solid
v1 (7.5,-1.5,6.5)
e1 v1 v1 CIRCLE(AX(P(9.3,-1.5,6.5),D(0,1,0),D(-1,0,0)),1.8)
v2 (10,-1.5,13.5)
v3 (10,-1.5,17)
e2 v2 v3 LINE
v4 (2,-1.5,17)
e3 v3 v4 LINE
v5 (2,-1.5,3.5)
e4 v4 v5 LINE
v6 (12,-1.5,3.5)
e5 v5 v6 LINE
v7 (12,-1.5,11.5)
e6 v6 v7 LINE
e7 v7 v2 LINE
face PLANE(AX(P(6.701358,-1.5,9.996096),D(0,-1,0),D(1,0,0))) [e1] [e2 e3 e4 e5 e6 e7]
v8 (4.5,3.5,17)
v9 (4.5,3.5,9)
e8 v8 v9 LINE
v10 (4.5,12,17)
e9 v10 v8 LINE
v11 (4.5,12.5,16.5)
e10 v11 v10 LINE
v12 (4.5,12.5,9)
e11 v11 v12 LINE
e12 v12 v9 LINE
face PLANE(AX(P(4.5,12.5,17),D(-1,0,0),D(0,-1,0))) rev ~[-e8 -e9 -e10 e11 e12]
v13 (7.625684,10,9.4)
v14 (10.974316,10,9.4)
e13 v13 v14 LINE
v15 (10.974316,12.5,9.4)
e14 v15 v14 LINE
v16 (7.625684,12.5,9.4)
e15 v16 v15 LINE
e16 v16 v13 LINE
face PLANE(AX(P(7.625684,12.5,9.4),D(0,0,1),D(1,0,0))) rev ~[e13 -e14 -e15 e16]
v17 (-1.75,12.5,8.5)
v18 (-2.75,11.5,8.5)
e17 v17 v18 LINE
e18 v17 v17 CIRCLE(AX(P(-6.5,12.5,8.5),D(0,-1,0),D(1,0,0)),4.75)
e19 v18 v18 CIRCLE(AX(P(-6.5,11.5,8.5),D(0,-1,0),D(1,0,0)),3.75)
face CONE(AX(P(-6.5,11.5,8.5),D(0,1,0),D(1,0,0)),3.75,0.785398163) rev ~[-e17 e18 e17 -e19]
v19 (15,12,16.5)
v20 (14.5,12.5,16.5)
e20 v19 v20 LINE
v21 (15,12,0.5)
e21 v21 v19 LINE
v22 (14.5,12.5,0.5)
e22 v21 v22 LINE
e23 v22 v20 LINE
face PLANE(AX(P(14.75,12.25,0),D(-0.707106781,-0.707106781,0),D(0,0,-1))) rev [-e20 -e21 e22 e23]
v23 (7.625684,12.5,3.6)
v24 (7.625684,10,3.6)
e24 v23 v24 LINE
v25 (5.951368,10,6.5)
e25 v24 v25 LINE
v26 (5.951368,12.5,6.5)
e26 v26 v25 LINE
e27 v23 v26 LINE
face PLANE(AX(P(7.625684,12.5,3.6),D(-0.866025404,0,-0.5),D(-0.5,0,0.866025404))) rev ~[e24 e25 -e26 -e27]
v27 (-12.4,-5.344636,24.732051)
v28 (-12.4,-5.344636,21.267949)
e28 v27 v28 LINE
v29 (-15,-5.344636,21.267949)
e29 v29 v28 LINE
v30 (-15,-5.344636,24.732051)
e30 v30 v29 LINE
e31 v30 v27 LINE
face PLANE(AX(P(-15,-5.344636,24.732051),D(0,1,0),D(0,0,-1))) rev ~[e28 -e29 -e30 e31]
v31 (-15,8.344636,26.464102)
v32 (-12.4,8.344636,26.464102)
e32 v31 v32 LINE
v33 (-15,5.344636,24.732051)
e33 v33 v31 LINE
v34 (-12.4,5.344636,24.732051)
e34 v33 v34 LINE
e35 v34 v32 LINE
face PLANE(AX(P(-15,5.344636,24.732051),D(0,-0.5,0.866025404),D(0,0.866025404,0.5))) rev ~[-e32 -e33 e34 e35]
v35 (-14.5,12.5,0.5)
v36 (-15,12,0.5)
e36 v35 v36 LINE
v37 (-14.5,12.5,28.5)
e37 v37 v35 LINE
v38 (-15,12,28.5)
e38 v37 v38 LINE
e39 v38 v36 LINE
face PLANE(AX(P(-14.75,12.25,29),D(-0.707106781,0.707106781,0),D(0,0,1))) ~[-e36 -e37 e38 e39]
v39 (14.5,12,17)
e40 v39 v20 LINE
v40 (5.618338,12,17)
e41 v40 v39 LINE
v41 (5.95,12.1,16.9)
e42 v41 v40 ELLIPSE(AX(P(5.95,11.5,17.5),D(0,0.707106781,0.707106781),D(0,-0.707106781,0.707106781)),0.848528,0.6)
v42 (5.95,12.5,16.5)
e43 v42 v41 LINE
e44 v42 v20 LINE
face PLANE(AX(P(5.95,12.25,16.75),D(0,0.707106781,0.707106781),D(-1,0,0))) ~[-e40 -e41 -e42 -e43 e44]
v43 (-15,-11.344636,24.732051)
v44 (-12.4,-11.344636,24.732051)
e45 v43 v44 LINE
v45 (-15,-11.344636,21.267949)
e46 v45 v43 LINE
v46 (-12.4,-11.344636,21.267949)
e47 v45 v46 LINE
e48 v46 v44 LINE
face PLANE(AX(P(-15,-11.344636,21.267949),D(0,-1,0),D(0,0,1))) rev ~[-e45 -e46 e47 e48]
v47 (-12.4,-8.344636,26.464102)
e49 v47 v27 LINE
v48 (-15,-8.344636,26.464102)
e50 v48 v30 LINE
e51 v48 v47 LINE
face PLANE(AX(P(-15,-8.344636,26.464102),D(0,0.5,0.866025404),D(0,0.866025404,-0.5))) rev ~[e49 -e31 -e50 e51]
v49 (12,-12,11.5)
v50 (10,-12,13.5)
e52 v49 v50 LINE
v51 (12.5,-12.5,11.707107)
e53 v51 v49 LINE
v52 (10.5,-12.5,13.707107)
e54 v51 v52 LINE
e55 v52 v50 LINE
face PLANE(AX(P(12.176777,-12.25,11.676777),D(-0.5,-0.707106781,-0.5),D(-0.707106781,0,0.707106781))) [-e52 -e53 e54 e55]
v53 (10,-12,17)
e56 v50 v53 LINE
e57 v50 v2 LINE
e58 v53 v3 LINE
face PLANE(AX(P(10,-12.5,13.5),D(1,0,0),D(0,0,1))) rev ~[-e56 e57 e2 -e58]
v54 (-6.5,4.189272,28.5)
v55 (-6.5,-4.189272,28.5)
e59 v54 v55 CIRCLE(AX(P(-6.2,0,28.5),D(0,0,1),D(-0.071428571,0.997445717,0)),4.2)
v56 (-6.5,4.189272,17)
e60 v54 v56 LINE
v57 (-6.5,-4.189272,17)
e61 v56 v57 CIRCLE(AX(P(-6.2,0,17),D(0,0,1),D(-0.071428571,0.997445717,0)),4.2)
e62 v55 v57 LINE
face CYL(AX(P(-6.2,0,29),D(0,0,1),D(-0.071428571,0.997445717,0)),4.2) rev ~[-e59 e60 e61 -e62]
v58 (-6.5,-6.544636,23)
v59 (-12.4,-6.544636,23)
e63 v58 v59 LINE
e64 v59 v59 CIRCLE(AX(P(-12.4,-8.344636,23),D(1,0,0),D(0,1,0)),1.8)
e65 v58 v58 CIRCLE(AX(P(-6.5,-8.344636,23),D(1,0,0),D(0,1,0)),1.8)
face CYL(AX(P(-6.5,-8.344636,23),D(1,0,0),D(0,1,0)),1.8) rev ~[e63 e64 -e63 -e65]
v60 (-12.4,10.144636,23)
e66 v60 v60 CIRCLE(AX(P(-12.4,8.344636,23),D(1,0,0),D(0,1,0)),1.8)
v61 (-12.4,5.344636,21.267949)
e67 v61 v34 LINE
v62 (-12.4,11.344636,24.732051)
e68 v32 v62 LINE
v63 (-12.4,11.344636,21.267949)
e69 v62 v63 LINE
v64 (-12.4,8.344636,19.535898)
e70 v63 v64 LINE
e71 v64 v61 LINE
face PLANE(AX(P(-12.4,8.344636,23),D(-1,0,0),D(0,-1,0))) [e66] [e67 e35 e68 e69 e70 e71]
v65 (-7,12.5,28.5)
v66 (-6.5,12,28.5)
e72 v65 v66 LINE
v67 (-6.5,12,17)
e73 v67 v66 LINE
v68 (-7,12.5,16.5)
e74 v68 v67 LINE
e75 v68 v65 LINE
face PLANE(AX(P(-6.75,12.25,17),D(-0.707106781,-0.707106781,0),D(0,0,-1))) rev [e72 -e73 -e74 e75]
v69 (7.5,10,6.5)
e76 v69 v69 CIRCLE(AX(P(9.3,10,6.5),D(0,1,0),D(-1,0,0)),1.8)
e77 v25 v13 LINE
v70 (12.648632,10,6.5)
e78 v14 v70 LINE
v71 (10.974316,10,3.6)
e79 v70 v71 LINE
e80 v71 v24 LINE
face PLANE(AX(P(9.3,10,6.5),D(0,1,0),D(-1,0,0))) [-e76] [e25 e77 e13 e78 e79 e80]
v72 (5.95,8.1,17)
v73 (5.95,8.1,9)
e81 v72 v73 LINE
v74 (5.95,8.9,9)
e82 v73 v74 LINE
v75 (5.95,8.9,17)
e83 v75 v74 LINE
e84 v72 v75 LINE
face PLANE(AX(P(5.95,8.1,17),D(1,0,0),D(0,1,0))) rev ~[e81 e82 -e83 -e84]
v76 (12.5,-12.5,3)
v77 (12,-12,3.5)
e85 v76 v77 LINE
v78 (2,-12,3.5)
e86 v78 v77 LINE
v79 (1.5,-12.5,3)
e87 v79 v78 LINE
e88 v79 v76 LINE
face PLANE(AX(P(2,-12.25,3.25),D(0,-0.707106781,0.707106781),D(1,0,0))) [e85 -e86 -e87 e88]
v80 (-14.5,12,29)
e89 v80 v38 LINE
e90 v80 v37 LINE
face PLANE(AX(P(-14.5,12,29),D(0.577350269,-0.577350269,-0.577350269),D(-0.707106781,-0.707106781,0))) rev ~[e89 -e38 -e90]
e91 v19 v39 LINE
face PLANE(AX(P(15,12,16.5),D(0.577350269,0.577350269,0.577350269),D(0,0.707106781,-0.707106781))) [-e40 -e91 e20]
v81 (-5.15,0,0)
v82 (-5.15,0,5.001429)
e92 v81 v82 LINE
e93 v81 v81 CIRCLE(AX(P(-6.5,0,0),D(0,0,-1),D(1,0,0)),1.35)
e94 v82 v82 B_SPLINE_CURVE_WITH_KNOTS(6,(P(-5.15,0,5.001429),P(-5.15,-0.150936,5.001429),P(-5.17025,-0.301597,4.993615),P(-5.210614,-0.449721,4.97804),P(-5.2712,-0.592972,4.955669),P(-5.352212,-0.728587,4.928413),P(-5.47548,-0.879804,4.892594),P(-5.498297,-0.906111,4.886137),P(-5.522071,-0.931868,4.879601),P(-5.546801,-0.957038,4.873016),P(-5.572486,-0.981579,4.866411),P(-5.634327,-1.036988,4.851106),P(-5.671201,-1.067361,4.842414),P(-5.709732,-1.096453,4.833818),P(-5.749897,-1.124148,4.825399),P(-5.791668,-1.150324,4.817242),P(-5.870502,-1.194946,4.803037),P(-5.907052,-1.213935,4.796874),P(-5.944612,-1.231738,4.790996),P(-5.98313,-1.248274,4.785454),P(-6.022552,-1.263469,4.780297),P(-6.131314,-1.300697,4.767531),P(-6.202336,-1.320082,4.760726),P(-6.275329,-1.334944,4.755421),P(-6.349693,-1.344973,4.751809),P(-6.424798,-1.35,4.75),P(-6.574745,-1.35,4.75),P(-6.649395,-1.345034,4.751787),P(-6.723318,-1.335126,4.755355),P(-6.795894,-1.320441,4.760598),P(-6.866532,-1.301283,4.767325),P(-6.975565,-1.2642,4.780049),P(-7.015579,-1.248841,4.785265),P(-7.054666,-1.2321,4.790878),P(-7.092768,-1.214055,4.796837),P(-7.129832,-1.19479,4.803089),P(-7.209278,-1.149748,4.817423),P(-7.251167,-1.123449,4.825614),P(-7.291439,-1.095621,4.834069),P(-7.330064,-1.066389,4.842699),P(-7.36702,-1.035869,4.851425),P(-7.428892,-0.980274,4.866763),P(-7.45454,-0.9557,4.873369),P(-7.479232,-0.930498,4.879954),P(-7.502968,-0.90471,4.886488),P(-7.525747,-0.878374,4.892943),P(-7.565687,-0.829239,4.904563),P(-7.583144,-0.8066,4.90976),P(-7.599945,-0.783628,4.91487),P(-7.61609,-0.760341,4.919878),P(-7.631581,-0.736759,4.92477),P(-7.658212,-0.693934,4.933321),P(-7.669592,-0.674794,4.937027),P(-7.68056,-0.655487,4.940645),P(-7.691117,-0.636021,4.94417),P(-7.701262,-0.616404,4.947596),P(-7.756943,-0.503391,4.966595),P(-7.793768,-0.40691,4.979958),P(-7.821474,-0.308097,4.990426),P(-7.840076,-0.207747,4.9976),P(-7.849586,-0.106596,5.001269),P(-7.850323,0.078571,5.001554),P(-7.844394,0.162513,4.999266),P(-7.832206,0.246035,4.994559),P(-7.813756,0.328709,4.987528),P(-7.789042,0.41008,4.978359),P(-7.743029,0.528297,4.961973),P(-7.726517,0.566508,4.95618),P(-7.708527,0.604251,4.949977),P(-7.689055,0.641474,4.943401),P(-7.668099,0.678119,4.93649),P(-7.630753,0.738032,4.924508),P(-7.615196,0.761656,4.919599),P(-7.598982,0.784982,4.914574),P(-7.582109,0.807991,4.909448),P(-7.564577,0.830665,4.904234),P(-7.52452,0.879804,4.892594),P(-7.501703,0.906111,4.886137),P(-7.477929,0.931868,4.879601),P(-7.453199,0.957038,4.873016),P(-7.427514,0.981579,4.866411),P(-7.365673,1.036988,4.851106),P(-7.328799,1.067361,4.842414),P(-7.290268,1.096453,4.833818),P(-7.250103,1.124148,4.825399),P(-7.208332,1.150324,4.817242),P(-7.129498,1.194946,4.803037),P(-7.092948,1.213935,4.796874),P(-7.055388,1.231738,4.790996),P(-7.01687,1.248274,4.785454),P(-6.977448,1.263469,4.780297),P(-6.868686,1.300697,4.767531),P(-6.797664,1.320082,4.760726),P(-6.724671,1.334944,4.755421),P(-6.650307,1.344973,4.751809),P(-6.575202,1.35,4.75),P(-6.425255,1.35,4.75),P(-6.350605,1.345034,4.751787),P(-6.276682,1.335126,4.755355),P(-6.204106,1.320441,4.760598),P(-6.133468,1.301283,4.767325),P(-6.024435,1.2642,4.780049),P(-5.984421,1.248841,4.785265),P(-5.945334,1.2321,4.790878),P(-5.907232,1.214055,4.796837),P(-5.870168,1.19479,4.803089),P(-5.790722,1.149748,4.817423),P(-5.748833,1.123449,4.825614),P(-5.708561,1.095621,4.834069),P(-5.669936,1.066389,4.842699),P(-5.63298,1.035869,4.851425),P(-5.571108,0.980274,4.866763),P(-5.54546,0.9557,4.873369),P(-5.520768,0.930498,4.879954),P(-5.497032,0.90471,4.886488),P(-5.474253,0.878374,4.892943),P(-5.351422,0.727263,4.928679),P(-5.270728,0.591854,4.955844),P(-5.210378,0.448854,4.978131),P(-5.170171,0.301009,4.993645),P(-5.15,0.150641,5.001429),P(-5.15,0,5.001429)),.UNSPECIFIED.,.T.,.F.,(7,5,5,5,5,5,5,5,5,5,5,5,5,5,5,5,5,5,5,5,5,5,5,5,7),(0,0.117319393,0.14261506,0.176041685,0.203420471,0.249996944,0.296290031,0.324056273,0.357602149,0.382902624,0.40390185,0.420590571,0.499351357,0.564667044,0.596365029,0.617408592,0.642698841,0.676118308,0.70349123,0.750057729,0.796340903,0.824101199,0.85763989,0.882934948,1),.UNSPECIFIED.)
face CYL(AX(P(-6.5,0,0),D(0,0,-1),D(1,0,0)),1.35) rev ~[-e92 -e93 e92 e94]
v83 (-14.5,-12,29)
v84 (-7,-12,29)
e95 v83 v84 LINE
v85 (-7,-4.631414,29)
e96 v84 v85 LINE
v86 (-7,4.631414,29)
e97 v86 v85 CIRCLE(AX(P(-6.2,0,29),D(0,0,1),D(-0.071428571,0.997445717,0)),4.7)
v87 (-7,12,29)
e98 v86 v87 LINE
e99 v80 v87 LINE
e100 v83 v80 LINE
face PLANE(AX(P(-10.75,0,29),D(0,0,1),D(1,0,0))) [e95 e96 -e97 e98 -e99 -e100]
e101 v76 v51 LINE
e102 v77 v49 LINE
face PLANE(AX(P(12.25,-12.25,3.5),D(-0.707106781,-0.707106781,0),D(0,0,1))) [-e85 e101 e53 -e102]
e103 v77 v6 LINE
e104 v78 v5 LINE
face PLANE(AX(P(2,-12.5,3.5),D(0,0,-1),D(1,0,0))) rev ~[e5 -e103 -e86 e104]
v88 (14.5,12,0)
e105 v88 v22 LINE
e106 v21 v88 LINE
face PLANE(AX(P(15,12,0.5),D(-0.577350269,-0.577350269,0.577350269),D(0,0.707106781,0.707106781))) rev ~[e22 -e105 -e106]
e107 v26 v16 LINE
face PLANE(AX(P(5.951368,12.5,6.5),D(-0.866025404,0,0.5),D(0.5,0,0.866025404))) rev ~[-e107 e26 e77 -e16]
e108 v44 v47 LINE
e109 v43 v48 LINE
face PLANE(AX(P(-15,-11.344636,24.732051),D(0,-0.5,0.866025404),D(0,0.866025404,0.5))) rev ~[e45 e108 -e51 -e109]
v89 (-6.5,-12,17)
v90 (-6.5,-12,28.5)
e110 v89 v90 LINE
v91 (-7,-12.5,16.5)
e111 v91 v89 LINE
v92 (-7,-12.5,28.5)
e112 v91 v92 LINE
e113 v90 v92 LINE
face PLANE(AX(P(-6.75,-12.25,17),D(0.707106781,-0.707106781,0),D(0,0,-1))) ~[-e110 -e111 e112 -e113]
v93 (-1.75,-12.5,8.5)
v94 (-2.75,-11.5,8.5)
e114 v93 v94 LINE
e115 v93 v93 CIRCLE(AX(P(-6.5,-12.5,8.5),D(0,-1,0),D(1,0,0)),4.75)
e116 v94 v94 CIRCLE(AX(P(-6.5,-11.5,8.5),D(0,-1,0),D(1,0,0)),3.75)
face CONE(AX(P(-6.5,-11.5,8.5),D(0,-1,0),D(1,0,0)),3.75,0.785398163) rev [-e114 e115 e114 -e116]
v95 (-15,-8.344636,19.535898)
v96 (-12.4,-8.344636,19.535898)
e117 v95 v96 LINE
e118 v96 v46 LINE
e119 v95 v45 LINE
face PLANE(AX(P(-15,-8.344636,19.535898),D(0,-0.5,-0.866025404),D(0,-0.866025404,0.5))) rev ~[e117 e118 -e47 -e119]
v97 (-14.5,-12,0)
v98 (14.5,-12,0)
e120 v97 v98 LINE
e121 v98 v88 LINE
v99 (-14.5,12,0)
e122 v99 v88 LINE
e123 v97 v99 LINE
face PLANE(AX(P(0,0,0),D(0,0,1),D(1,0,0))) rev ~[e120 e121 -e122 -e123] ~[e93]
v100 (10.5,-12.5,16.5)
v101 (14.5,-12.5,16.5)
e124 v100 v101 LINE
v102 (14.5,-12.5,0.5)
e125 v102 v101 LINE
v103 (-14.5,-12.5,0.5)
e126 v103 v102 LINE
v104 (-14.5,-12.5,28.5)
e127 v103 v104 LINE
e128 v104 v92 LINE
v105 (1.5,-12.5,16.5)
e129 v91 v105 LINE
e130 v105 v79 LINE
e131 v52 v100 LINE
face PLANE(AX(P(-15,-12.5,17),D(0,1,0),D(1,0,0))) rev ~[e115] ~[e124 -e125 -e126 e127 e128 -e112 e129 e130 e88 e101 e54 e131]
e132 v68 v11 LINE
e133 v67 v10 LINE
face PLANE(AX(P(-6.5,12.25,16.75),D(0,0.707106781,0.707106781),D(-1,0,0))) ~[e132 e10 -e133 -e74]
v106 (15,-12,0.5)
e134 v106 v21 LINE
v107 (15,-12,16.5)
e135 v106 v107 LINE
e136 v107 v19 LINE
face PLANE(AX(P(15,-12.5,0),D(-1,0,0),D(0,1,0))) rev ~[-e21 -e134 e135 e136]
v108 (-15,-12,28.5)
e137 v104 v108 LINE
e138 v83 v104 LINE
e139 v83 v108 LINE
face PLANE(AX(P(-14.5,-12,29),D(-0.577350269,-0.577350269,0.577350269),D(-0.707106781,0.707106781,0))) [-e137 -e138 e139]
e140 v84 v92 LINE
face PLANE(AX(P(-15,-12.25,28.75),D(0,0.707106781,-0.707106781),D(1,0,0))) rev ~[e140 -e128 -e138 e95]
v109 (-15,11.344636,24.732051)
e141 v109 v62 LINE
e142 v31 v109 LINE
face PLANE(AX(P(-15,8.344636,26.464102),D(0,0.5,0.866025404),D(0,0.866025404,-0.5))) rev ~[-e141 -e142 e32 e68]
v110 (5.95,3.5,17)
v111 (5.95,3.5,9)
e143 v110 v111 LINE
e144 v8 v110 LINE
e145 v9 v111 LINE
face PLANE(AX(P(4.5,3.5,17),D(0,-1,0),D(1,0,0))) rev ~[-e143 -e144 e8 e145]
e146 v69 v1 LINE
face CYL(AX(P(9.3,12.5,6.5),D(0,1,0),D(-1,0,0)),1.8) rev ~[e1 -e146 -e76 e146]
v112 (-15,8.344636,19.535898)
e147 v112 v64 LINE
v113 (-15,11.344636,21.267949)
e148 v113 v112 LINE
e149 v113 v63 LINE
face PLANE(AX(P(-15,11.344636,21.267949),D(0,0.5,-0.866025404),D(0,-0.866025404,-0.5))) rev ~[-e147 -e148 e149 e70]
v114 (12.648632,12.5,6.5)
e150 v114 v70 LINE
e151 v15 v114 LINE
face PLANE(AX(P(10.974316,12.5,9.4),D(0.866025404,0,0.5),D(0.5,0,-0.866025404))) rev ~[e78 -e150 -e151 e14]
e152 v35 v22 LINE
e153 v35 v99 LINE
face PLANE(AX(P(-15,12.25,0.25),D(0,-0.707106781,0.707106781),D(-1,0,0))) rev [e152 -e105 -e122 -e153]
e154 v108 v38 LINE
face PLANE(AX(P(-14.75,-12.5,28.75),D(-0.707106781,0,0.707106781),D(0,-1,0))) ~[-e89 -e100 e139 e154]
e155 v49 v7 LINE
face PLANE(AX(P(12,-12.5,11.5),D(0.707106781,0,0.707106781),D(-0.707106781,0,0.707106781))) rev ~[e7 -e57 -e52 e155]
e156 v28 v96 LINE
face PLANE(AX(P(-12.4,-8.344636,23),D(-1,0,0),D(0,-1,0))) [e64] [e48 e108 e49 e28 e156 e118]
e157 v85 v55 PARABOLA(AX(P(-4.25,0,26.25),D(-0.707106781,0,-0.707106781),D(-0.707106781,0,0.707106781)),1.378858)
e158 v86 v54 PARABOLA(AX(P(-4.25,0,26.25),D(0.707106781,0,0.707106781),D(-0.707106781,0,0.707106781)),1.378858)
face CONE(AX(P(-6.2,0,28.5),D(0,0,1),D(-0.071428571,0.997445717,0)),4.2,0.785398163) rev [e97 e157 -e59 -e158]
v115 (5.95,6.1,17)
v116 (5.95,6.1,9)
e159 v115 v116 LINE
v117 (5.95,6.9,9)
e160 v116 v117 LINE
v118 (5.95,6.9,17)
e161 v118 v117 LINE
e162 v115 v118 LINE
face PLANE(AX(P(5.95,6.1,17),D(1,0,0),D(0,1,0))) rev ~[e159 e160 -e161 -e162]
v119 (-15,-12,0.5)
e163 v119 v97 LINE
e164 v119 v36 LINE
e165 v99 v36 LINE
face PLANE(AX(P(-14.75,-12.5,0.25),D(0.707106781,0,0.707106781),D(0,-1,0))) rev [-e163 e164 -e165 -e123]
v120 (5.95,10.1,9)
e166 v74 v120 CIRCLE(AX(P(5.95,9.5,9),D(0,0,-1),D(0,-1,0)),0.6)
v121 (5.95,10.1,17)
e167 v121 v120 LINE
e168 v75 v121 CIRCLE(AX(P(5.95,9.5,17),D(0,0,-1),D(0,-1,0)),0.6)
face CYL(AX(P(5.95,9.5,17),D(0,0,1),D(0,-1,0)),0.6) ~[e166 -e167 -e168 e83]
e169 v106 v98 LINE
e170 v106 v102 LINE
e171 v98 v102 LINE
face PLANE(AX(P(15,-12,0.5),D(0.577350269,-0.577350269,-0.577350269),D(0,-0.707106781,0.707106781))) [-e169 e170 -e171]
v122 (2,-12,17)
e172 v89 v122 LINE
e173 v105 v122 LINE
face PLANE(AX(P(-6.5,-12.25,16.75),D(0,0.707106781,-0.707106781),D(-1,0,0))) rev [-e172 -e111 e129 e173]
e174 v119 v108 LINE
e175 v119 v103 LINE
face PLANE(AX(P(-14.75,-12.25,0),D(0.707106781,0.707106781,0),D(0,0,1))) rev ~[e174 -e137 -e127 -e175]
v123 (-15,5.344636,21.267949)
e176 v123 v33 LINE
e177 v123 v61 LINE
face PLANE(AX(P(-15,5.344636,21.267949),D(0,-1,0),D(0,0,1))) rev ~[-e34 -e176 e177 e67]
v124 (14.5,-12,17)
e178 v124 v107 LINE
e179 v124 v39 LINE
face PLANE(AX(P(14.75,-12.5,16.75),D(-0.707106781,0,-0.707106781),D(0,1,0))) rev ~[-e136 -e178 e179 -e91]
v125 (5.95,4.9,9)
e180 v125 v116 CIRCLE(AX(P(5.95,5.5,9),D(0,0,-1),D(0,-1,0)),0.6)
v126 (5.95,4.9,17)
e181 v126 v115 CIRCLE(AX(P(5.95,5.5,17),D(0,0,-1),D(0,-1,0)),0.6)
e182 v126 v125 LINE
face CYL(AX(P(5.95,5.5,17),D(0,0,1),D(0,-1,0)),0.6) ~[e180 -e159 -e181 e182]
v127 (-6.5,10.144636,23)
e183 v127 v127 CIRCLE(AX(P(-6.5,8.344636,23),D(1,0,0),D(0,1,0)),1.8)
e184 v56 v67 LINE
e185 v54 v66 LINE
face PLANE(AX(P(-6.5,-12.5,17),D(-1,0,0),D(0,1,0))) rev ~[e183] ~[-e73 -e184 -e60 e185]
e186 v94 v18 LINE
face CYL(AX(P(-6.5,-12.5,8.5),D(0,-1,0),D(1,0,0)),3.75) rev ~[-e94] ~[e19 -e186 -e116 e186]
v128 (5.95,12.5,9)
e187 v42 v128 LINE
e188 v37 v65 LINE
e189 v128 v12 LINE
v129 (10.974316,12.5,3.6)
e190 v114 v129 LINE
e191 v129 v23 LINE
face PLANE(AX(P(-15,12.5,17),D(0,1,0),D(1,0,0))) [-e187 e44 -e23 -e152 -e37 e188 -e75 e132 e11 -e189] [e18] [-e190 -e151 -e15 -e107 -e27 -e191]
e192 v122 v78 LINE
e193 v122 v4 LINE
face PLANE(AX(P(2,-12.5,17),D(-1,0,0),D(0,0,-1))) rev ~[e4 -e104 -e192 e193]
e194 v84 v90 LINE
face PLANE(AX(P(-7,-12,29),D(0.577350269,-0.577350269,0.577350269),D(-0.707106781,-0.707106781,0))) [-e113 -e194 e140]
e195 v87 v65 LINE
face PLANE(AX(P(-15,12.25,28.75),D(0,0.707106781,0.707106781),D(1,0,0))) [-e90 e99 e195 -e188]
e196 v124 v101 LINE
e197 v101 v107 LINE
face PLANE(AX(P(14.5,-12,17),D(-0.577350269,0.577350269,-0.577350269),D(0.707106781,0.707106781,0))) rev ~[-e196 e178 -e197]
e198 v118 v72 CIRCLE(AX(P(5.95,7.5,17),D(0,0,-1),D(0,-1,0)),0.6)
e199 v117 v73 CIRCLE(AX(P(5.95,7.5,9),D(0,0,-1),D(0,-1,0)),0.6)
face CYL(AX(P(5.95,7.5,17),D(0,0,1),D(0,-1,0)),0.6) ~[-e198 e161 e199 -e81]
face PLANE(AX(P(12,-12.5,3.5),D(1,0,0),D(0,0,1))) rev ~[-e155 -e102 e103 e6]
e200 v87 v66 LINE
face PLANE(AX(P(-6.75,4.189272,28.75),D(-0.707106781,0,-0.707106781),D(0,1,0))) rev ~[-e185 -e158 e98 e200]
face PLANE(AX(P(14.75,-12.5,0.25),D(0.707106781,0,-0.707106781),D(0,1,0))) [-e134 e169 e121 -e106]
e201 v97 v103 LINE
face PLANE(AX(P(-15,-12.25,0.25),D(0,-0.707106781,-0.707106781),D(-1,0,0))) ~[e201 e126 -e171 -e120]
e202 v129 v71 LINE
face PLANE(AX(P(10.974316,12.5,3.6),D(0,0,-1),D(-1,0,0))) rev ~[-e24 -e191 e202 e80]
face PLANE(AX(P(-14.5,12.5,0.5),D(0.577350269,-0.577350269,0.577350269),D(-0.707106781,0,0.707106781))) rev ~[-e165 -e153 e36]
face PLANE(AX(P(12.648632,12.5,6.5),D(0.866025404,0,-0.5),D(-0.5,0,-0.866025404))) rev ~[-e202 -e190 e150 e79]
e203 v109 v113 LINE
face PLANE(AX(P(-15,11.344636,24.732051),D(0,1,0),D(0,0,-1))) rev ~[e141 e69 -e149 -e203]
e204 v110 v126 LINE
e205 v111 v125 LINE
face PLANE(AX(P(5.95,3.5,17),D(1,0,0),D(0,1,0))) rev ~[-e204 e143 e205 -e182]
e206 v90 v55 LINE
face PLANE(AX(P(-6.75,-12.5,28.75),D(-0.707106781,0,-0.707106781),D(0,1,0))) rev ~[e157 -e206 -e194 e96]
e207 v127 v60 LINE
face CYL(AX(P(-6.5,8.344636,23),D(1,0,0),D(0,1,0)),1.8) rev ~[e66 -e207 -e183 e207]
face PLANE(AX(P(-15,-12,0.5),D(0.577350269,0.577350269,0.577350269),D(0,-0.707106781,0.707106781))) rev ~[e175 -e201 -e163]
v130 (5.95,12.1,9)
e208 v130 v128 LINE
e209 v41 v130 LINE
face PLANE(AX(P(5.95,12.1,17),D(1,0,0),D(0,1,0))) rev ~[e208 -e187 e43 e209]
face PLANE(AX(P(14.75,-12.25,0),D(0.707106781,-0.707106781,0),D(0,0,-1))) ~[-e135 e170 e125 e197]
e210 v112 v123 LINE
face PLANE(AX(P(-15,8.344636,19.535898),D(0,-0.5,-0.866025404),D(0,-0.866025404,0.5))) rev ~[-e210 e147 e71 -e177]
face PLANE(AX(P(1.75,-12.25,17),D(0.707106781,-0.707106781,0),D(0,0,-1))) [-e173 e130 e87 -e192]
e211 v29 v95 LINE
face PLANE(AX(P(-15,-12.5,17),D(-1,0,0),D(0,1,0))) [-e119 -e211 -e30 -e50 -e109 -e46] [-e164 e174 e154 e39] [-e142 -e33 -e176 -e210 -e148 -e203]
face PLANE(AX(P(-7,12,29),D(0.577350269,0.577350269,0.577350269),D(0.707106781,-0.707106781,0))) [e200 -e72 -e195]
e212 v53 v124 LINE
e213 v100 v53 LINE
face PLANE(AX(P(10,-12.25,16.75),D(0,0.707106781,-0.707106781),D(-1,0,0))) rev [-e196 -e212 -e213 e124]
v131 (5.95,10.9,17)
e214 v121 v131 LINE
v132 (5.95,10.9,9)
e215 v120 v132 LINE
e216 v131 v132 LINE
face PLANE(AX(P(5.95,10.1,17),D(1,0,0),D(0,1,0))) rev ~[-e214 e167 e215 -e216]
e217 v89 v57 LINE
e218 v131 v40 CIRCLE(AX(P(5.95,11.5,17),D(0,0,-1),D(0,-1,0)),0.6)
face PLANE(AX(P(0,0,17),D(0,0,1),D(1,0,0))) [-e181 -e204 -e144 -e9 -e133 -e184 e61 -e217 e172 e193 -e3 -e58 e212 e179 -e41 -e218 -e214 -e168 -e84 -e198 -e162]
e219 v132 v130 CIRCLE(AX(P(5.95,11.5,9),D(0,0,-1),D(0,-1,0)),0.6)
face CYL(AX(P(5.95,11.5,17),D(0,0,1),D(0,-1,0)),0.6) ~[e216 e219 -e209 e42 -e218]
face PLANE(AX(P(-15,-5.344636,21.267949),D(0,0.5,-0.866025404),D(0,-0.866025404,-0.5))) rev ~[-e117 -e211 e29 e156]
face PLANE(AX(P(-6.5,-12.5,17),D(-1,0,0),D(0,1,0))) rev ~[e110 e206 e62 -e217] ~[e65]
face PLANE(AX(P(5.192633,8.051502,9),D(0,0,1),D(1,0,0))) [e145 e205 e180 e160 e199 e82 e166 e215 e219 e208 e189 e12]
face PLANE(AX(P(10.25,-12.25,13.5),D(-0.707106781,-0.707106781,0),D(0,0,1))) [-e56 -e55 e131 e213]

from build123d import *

# Parameters (mm, degrees)
F0_W      = 30
F0_H      = 25
F1_DEPTH  = 17
F3_DEPTH  = 11
F4_R      = 3.75
F5_DEPTH  = 25
F6_W      = 8.5
F6_H      = 25
F7_DEPTH  = 12
F9_DEPTH  = 12
F10_R     = 1.8
F11_DEPTH = 8.5
F12_R     = 1.8
F13_DEPTH = 2.6
F15_DEPTH = 8
F16_R     = 1.8
F17_DEPTH = 14
F18_R     = 1.8
F19_DEPTH = 2.5
F21_SIZE  = 0.5
F22_SIZE2 = 1
F22_SIZE  = 1
F23_R     = 1.35
F24_DEPTH = 5.0024289632


# Not quite as in the source:
# - a feature names something its author has since deleted; it is built from what else it names


with BuildPart() as f1:
    # F0 (on Top) → F1 (new body)
    with BuildSketch(Plane.XY):
        Rectangle(F0_W, F0_H)
    extrude(amount=F1_DEPTH)

    # F2 (on face) → F3 (cut)
    with BuildSketch(Plane.XZ.offset(12.5)):
        Polygon((10, 17), (2, 17), (2, 3.5), (12, 3.5), (12, 11.5), (10, 13.5), align=None)
    extrude(amount=-F3_DEPTH, mode=Mode.SUBTRACT)

    # F4 (on face) → F5 (cut, through all)
    with BuildSketch(Plane.XZ.offset(12.5)):
        with Locations((-6.5, 8.5)):
            Circle(F4_R)
    extrude(amount=-F5_DEPTH, mode=Mode.SUBTRACT)

    # F6 (on face) → F7 (join)
    with BuildSketch(Plane.XY.offset(17)):
        with Locations((-10.75, 0)):
            Rectangle(F6_W, F6_H)
    extrude(amount=F7_DEPTH)

    # F8 (on face) → F9 (cut)
    with BuildSketch(Plane.XY.offset(29)):
        with BuildLine():
            Line((-6.5, -4.1892720131), (-6.5, 4.1892720131))
            ThreePointArc((-6.5, 4.1892720131), (-10.4, 0), (-6.5, -4.1892720131))
        make_face()
    extrude(amount=-F9_DEPTH, mode=Mode.SUBTRACT)

    # F10 (on face) → F11 (cut, through all)
    with BuildSketch(Plane.YZ.offset(-6.5)):
        with Locations((-8.3446360066, 23)):
            Circle(F10_R)
        with Locations((8.3446360066, 23)):
            Circle(F10_R)
    extrude(amount=-F11_DEPTH, mode=Mode.SUBTRACT)

    # F12 (on face) → F13 (cut)
    with BuildSketch(Plane(origin=(-15, 0, 0), x_dir=(0, -1, 0), z_dir=(-1, 0, 0))):
        Polygon((11.3446360067, 21.2679491924), (11.3446360067, 24.7320508076), (8.3446360067, 26.4641016151), (5.3446360067, 24.7320508076), (5.3446360067, 21.2679491924), (8.3446360067, 19.5358983849), align=None)
        with Locations((8.3446360066, 23)):
            Circle(F12_R, mode=Mode.SUBTRACT)
        Polygon((-5.3446360064, 21.2679491924), (-5.3446360064, 24.7320508076), (-8.3446360064, 26.4641016151), (-11.3446360064, 24.7320508076), (-11.3446360064, 21.2679491924), (-8.3446360064, 19.5358983849), align=None)
        with Locations((-8.3446360066, 23)):
            Circle(F12_R, mode=Mode.SUBTRACT)
    extrude(amount=-F13_DEPTH, mode=Mode.SUBTRACT)

    # F14 (on face) → F15 (cut)
    with BuildSketch(Plane.XY.offset(17)):
        with BuildLine():
            Line((5.95, 12.5), (4.5, 12.5))
            Line((4.5, 12.5), (4.5, 3.5))
            Line((4.5, 3.5), (5.95, 3.5))
            Line((5.95, 3.5), (5.95, 4.9))
            ThreePointArc((5.95, 4.9), (5.35, 5.5), (5.95, 6.1))
            Line((5.95, 6.1), (5.95, 6.9))
            ThreePointArc((5.95, 6.9), (5.35, 7.5), (5.95, 8.1))
            Line((5.95, 8.1), (5.95, 8.9))
            ThreePointArc((5.95, 8.9), (5.35, 9.5), (5.95, 10.1))
            Line((5.95, 10.1), (5.95, 10.9))
            ThreePointArc((5.95, 10.9), (5.35, 11.5), (5.95, 12.1))
            Line((5.95, 12.1), (5.95, 12.5))
        make_face()
    extrude(amount=-F15_DEPTH, mode=Mode.SUBTRACT)

    # F16 (on face) → F17 (cut, through all)
    with BuildSketch(Plane(origin=(0, 12.5, 0), x_dir=(-1, 0, 0), z_dir=(0, 1, 0))):
        with Locations((-9.3, 6.5)):
            Circle(F16_R)
    extrude(amount=-F17_DEPTH, mode=Mode.SUBTRACT)

    # F18 (on face) → F19 (cut)
    with BuildSketch(Plane(origin=(0, 12.5, 0), x_dir=(-1, 0, 0), z_dir=(0, 1, 0))):
        Polygon((-7.6256842194, 9.4), (-10.9743157806, 9.4), (-12.6486315613, 6.5), (-10.9743157806, 3.6), (-7.6256842194, 3.6), (-5.9513684387, 6.5), align=None)
        with Locations((-9.3, 6.5)):
            Circle(F18_R, mode=Mode.SUBTRACT)
    extrude(amount=-F19_DEPTH, mode=Mode.SUBTRACT)

    # F21
    f21_edges = [f1.edges().sort_by_distance(p)[0] for p in [
        (0, -12.5, 0),
        (-15, 0, 0),
        (0, 12.5, 0),
        (15, 0, 0),
        (-1, 12.5, 17),
        (10.475, 12.5, 17),
        (-15, 12.5, 14.5),
        (-15, -12.5, 14.5),
        (2, -12.5, 10.25),
        (-6.5, -12.5, 23),
        (7, -12.5, 3.5),
        (12, -12.5, 7.5),
        (11, -12.5, 12.5),
        (10, -12.5, 15.25),
        (15, -12.5, 8.5),
        (12.5, -12.5, 17),
        (15, 0, 17),
        (15, 12.5, 8.5),
        (-6.5, 12.5, 23),
        (-10.75, 12.5, 29),
        (-6.5, 8.344636, 29),
        (-6.5, -8.344636, 29),
        (-10.75, -12.5, 29),
        (-2.25, -12.5, 17),
        (-15, 0, 29),
        (-10.4, 0, 29),
    ]]
    chamfer(f21_edges, length=F21_SIZE)

    # F22
    f22_edges = [f1.edges().sort_by_distance(p)[0] for p in [
        (-2.75, 0, 8.5),
        (-10.25, -12.5, 8.5),
        (-10.25, 12.5, 8.5),
    ]]
    chamfer(f22_edges, length=F22_SIZE, length2=F22_SIZE2)

    # F23 (on face) → F24 (cut, through all)
    with BuildSketch(Plane(origin=(0, 0, 0), x_dir=(1, 0, 0), z_dir=(0, 0, -1))):
        with Locations((-6.5, 0)):
            Circle(F23_R)
    extrude(amount=-F24_DEPTH, mode=Mode.SUBTRACT)


solid = f1.part
